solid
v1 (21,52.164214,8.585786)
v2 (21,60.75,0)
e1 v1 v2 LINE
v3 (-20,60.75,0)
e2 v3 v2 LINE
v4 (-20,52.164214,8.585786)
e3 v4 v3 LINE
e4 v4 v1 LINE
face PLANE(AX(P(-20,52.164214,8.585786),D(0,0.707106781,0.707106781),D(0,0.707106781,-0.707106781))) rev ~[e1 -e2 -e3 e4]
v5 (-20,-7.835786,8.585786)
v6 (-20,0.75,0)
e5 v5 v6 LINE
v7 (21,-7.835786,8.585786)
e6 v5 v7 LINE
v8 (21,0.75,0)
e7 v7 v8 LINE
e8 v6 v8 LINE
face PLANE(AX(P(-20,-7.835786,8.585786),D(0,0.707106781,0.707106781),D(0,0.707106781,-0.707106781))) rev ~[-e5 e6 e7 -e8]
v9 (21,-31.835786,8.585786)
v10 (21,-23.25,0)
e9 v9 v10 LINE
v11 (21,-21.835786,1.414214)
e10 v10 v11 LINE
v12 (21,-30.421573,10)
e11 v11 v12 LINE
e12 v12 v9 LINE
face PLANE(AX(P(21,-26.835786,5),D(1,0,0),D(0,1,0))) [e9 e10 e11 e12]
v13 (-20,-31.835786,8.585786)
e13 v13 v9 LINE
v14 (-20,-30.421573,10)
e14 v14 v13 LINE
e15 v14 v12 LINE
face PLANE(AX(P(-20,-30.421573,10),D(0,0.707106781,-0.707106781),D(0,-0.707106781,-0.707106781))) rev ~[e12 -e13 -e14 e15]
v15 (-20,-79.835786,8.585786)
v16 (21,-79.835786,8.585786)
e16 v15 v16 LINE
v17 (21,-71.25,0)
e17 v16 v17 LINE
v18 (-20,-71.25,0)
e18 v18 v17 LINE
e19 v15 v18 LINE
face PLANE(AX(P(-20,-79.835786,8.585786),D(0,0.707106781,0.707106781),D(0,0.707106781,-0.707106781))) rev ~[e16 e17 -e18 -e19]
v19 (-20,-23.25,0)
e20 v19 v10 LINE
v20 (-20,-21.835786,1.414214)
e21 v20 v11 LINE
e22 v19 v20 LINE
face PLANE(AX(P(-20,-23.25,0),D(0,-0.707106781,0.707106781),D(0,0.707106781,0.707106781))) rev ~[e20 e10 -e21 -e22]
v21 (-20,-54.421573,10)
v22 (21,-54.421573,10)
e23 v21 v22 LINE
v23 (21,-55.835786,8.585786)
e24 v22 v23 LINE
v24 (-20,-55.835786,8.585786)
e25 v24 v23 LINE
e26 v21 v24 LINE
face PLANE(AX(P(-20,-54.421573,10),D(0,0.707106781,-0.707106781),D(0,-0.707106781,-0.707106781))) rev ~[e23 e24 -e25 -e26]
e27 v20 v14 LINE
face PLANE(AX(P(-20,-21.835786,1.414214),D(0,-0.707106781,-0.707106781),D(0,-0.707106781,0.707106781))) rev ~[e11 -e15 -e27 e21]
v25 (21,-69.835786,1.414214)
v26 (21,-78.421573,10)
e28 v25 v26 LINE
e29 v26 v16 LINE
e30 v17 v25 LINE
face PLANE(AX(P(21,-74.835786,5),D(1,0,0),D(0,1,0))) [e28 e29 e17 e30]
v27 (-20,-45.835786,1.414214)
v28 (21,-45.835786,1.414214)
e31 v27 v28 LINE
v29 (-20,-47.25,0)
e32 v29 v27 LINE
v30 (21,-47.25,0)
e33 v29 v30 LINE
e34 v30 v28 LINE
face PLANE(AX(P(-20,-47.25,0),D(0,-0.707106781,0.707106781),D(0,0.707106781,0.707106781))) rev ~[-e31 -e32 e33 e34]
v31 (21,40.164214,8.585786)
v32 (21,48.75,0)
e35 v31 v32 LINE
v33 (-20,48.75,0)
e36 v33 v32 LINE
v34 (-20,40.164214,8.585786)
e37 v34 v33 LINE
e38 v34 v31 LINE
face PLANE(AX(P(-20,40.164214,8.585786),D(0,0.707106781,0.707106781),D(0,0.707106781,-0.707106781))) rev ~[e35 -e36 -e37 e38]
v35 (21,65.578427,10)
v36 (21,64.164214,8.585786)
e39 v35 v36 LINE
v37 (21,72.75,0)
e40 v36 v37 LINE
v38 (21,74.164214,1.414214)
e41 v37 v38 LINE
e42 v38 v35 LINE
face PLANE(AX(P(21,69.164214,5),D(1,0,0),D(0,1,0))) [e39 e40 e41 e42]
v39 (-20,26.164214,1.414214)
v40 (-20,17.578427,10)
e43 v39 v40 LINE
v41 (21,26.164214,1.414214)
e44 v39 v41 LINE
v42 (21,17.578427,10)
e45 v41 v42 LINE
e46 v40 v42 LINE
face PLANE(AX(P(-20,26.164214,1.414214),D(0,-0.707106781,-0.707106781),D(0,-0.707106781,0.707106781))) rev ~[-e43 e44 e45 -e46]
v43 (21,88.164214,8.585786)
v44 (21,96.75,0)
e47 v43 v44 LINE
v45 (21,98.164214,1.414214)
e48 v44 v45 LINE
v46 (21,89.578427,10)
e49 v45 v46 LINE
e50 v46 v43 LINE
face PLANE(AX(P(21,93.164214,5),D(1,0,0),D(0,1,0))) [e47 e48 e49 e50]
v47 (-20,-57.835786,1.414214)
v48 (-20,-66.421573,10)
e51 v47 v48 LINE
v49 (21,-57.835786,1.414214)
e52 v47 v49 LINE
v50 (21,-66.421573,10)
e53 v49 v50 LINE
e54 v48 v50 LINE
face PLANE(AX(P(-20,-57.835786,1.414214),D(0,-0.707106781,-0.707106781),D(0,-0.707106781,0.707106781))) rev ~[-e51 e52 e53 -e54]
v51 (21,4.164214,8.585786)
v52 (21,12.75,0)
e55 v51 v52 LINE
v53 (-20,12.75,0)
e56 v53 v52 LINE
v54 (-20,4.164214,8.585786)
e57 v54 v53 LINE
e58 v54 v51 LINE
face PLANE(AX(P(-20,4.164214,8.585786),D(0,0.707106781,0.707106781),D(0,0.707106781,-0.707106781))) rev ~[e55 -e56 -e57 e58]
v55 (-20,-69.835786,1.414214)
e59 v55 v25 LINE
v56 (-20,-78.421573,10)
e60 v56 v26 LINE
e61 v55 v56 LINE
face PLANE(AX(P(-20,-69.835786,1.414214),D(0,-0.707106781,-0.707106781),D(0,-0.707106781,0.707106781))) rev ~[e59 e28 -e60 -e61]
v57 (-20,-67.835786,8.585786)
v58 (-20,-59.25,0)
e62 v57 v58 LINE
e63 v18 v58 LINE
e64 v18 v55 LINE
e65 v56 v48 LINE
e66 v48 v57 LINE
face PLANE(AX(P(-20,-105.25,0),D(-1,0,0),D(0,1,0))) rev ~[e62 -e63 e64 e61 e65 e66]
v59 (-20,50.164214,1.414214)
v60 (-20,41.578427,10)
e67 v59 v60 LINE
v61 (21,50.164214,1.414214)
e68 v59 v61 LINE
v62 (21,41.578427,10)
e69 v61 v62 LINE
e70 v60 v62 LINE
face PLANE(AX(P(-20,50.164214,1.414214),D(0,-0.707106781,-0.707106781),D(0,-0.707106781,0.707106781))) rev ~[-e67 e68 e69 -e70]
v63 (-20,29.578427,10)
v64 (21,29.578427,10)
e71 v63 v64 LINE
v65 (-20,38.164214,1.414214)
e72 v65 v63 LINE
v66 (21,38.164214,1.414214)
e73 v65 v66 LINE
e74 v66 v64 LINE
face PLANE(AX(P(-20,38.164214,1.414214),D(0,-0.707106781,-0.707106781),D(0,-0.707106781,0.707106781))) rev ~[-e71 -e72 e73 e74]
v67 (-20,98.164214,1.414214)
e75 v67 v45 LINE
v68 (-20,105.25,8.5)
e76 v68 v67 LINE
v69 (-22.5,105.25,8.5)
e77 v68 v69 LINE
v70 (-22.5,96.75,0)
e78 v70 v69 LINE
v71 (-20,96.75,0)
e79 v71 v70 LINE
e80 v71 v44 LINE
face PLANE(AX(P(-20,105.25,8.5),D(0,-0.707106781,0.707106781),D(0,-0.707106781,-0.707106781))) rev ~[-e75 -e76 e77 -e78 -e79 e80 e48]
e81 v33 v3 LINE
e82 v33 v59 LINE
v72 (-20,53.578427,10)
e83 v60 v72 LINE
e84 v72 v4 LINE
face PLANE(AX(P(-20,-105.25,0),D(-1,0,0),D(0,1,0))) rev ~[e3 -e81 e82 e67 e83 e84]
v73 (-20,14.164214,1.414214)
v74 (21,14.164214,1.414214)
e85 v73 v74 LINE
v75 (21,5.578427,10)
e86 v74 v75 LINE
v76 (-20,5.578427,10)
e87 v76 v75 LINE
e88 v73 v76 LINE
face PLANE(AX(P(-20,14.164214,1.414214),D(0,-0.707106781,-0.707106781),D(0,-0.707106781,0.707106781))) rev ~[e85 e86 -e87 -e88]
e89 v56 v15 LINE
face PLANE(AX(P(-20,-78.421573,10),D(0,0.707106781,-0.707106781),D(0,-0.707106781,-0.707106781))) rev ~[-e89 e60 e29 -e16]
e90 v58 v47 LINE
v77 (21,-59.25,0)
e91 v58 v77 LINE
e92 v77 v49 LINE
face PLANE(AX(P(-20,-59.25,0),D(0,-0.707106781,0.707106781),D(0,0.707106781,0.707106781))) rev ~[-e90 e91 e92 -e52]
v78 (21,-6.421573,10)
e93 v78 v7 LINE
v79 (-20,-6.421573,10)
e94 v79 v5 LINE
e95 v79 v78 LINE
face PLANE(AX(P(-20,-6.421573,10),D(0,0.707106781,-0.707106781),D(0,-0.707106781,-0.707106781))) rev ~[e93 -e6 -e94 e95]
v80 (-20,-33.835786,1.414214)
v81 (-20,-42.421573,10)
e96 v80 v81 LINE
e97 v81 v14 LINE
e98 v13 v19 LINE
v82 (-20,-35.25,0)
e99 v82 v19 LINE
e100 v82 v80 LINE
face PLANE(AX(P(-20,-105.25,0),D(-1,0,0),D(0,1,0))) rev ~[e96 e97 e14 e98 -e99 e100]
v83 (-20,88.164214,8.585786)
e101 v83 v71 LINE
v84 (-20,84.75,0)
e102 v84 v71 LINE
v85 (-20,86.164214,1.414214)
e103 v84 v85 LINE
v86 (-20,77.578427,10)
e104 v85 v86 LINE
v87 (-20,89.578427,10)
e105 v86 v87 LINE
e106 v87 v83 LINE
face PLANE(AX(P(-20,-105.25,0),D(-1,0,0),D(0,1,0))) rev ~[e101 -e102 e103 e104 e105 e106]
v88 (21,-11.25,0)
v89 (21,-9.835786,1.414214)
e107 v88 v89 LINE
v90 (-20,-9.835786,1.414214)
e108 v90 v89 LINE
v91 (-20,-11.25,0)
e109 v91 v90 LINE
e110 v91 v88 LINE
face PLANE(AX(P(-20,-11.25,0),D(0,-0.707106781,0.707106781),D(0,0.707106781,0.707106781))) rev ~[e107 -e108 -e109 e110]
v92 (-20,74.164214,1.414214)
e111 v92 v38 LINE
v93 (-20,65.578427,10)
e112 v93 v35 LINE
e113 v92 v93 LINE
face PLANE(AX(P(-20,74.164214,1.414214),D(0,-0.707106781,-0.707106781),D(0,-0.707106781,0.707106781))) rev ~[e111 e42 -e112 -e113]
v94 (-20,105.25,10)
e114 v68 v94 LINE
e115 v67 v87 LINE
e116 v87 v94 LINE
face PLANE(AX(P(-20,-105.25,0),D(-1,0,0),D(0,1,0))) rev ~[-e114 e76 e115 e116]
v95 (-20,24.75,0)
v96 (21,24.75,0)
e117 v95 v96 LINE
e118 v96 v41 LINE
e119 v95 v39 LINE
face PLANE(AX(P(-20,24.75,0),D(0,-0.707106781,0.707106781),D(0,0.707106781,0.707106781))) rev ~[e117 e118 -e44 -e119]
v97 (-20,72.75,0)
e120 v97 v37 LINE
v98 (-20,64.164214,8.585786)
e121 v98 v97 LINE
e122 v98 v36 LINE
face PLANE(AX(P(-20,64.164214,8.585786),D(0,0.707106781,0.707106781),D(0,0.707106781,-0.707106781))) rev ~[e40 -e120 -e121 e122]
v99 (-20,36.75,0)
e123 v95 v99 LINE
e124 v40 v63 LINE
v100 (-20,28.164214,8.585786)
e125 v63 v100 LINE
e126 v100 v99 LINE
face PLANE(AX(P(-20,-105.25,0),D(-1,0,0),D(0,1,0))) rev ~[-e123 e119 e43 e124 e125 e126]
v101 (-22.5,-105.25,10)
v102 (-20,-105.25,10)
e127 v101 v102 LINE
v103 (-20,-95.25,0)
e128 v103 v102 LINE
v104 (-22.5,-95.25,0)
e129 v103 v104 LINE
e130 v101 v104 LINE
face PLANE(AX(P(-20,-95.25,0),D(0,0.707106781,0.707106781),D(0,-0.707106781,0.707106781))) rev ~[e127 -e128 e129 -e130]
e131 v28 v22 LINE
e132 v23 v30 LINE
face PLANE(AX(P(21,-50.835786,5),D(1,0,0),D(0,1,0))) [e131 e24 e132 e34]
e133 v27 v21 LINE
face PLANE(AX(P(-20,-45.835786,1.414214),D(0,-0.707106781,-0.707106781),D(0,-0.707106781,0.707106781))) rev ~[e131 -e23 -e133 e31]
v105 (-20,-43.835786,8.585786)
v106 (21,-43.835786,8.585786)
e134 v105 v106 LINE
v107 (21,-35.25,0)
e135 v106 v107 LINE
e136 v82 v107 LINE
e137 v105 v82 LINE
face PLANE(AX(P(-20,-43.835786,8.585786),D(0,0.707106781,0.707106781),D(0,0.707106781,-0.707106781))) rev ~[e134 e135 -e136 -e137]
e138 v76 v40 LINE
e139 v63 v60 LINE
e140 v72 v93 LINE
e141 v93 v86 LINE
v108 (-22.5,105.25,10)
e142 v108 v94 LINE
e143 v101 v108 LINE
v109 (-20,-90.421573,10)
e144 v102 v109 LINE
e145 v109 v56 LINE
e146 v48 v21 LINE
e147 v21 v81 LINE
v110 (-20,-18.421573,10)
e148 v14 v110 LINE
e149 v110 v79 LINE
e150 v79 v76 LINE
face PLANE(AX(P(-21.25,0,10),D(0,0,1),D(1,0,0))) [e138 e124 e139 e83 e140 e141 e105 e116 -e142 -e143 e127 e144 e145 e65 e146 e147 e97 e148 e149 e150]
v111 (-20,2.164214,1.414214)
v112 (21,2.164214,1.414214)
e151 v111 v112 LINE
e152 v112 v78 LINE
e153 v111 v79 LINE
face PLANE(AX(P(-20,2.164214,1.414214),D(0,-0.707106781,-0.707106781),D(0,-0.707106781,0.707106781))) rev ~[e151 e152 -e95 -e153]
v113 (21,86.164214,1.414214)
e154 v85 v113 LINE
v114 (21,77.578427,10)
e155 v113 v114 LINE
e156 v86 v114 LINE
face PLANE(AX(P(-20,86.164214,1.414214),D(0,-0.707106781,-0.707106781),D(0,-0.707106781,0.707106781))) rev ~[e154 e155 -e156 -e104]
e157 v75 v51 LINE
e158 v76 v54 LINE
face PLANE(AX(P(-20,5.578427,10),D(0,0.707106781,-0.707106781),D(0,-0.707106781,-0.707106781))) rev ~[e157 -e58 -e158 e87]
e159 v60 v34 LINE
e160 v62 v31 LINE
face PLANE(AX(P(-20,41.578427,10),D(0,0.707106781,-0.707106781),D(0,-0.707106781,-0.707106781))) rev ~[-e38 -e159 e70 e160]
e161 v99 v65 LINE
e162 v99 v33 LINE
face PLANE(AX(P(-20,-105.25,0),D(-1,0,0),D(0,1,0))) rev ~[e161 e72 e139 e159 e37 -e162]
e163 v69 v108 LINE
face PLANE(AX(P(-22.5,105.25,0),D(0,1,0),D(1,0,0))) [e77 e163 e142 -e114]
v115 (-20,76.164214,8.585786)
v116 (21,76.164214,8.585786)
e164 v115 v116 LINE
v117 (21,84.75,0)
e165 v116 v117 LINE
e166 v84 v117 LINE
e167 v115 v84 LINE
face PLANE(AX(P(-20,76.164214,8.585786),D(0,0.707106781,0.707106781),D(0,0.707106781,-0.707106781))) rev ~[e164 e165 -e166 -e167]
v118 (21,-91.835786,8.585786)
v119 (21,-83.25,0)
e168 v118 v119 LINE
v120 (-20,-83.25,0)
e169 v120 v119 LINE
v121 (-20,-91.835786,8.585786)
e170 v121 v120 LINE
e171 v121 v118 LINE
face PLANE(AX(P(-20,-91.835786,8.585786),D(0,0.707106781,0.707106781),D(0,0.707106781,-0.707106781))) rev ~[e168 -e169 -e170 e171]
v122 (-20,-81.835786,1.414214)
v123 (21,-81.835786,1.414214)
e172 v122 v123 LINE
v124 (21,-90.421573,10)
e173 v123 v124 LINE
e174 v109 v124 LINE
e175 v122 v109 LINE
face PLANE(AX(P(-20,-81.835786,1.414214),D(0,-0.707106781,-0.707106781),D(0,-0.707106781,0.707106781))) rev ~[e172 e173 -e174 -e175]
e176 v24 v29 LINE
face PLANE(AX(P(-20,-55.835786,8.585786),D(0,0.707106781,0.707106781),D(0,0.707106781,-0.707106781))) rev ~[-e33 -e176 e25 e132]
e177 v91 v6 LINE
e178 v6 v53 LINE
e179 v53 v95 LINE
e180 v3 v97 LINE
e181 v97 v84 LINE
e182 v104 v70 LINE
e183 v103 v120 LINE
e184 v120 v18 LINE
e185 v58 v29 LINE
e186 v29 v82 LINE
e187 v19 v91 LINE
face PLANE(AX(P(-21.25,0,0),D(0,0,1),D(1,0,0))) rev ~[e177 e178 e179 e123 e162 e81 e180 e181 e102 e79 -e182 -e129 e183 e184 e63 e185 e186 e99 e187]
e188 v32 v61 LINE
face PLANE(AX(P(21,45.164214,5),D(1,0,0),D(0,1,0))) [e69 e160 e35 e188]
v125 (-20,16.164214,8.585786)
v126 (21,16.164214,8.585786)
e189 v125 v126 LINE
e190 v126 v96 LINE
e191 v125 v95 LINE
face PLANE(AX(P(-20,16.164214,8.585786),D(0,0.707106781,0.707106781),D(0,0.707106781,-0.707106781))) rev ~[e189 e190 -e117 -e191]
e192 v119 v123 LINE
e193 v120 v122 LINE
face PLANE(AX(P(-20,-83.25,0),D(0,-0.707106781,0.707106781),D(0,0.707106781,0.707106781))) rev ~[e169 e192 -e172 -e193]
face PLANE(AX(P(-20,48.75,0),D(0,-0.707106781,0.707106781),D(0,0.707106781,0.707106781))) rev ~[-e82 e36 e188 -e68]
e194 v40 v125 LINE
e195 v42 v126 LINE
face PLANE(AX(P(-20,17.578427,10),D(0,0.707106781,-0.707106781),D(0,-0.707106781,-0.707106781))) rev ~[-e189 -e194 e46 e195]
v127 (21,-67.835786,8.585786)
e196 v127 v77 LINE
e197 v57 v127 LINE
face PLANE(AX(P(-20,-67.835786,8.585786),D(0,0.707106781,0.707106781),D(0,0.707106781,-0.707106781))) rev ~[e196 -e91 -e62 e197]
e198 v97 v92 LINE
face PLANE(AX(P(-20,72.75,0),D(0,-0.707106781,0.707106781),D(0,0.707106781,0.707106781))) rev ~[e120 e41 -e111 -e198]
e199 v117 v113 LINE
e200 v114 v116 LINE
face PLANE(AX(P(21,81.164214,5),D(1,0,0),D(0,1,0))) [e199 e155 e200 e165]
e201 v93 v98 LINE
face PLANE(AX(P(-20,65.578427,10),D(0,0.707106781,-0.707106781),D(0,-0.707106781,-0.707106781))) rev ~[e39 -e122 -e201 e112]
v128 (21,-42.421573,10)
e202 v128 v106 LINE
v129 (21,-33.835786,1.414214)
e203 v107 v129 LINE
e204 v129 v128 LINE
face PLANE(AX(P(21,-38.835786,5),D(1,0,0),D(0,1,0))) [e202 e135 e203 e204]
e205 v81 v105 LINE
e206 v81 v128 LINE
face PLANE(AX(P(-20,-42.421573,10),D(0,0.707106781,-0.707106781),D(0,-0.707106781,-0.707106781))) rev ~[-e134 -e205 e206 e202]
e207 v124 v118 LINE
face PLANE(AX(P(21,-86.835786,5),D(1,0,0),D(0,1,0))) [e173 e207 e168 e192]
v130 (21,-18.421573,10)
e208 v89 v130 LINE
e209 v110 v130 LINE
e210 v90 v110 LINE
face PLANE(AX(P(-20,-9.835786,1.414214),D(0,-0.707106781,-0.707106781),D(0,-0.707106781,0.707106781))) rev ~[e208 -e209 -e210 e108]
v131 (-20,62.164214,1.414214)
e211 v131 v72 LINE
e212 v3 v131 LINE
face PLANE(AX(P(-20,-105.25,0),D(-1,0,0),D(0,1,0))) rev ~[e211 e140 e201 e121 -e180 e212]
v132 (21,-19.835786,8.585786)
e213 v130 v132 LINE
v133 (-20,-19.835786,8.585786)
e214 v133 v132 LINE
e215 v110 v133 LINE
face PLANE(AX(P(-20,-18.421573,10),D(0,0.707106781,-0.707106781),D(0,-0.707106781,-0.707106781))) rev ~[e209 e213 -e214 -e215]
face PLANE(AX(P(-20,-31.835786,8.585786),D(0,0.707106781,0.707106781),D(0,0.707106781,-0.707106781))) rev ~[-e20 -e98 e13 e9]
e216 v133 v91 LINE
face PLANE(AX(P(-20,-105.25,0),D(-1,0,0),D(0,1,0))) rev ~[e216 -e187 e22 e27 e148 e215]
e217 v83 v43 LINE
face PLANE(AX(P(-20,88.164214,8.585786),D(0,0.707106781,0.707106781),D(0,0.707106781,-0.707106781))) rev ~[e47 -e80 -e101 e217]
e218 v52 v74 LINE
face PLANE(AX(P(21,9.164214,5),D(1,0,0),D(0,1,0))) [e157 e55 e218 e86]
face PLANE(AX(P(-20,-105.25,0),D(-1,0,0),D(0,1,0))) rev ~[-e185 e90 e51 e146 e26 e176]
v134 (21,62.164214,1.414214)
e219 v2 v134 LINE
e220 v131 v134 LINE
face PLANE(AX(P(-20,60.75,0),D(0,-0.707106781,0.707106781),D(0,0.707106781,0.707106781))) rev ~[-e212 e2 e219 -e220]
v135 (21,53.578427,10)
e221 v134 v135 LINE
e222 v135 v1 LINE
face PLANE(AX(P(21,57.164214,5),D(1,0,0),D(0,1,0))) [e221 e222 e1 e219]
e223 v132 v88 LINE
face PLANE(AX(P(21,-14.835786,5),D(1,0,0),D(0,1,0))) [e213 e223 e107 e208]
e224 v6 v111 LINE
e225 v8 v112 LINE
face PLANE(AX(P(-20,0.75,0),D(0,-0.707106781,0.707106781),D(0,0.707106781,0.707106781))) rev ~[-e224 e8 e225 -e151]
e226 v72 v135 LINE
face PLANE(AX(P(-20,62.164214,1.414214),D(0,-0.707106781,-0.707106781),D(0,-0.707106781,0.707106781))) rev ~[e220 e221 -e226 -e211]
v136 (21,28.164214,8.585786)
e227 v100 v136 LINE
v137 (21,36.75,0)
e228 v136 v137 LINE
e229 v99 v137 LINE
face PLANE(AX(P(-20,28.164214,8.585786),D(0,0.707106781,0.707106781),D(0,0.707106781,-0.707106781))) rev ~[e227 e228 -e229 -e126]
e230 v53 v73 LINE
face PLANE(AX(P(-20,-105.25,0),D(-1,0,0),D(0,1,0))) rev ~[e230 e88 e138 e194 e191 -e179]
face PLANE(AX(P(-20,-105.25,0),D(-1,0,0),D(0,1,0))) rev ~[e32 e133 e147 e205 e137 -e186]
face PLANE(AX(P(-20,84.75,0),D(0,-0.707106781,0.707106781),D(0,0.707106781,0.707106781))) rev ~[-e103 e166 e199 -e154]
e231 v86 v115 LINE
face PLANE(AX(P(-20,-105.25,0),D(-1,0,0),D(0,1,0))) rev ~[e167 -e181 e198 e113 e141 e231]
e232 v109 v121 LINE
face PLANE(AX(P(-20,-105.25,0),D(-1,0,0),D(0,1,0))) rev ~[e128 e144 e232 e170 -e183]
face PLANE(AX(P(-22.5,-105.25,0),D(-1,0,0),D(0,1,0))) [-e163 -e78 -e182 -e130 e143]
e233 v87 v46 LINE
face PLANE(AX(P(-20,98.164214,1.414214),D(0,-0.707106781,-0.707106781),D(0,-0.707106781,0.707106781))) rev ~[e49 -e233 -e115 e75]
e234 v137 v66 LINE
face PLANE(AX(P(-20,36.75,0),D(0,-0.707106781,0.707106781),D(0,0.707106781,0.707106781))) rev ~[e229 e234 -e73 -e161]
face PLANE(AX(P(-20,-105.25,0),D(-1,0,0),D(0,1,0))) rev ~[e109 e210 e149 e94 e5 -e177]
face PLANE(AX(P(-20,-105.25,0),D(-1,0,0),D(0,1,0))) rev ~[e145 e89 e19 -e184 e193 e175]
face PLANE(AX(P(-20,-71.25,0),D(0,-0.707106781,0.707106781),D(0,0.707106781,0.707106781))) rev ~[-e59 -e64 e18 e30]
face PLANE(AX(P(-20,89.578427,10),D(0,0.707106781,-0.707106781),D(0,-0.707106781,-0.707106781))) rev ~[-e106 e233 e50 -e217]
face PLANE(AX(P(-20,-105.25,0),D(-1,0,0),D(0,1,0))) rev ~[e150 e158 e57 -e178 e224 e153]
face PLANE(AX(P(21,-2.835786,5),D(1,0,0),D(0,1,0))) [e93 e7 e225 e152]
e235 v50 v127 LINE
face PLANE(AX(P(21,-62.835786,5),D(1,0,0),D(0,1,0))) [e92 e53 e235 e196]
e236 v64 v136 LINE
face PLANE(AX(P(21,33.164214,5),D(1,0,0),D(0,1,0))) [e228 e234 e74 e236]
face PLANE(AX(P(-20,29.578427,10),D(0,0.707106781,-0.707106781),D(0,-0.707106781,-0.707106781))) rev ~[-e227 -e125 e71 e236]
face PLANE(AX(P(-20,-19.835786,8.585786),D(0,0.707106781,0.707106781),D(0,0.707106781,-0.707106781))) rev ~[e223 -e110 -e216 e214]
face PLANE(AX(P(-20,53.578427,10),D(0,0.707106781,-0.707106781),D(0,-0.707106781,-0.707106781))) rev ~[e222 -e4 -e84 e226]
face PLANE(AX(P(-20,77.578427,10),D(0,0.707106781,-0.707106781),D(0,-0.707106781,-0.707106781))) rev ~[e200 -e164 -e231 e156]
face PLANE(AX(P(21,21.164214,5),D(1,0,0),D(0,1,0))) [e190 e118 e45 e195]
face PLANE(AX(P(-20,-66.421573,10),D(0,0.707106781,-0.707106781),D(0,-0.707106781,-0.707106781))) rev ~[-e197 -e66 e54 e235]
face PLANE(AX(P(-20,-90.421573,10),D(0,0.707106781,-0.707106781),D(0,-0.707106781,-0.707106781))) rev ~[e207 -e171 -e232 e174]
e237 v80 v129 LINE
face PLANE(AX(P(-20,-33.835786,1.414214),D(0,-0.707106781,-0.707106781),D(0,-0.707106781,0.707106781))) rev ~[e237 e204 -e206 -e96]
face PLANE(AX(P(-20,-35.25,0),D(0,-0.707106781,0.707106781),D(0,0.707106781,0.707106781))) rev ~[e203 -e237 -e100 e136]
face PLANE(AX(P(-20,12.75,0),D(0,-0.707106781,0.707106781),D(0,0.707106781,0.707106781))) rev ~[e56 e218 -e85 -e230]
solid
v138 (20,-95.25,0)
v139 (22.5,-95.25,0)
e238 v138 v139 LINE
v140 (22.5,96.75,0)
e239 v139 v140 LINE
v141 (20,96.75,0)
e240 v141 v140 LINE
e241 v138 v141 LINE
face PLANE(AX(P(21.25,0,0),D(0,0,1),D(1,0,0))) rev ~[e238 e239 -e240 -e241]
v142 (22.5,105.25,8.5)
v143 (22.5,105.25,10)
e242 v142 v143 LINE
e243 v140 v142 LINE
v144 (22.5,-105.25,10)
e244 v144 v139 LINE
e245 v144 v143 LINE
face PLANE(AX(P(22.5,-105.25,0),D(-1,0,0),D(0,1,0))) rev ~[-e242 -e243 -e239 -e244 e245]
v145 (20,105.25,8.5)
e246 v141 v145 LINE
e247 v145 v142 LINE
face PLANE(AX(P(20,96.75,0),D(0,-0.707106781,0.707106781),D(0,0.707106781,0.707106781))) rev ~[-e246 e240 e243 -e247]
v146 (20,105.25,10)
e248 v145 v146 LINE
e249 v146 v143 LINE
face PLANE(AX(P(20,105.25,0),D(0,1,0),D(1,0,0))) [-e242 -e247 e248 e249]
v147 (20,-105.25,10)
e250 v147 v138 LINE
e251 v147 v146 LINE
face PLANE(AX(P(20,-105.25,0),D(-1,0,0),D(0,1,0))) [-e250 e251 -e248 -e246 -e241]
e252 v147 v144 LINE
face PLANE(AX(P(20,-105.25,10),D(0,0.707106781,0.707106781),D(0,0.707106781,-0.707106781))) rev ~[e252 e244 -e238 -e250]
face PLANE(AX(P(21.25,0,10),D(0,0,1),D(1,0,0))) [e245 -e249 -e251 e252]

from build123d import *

# Parameters (mm, degrees)
F0_W     = 2.5
F0_H     = 210.5
F1_DEPTH = 10
F3_DEPTH = 41
F4_DEPTH = 3
F6_DEPTH = 4


with BuildPart() as f1:
    # F0 (on Top) → F1 (new body)
    with BuildSketch(Plane.XY):
        with Locations((-21.25, 0)):
            Rectangle(F0_W, F0_H)
    extrude(amount=F1_DEPTH)

    # F2 (on face) → F3 (join)
    with BuildSketch(Plane.YZ.offset(-20)):
        Polygon((-91.8357864376, 8.5857864376), (-83.25, 0), (-81.8357864376, 1.4142135624), (-90.4215728753, 10), align=None)
        Polygon((-79.8357864376, 8.5857864376), (-71.25, 0), (-69.8357864376, 1.4142135624), (-78.4215728753, 10), align=None)
        Polygon((-67.8357864376, 8.5857864376), (-59.25, 0), (-57.8357864376, 1.4142135624), (-66.4215728753, 10), align=None)
        Polygon((-55.8357864376, 8.5857864376), (-47.25, 0), (-45.8357864376, 1.4142135624), (-54.4215728753, 10), align=None)
        Polygon((-43.8357864376, 8.5857864376), (-35.25, 0), (-33.8357864376, 1.4142135624), (-42.4215728753, 10), align=None)
        Polygon((-31.8357864376, 8.5857864376), (-23.25, 0), (-21.8357864376, 1.4142135624), (-30.4215728753, 10), align=None)
        Polygon((-19.8357864376, 8.5857864376), (-11.25, 0), (-9.8357864376, 1.4142135624), (-18.4215728753, 10), align=None)
        Polygon((-7.8357864376, 8.5857864376), (0.75, 0), (2.1642135624, 1.4142135624), (-6.4215728753, 10), align=None)
        Polygon((4.1642135624, 8.5857864376), (12.75, 0), (14.1642135624, 1.4142135624), (5.5784271247, 10), align=None)
        Polygon((16.1642135624, 8.5857864376), (24.75, 0), (26.1642135624, 1.4142135624), (17.5784271247, 10), align=None)
        Polygon((28.1642135624, 8.5857864376), (36.75, 0), (38.1642135624, 1.4142135624), (29.5784271247, 10), align=None)
        Polygon((40.1642135624, 8.5857864376), (48.75, 0), (50.1642135624, 1.4142135624), (41.5784271247, 10), align=None)
        Polygon((52.1642135624, 8.5857864376), (60.75, 0), (62.1642135624, 1.4142135624), (53.5784271247, 10), align=None)
        Polygon((64.1642135624, 8.5857864376), (72.75, 0), (74.1642135624, 1.4142135624), (65.5784271247, 10), align=None)
        Polygon((76.1642135624, 8.5857864376), (84.75, 0), (86.1642135624, 1.4142135624), (77.5784271247, 10), align=None)
        Polygon((88.1642135624, 8.5857864376), (96.75, 0), (98.1642135624, 1.4142135624), (89.5784271247, 10), align=None)
    extrude(amount=F3_DEPTH)

    # F2 (on face) → F4 (cut)
    with BuildSketch(Plane.YZ.offset(-20)):
        Polygon((98.1642135624, 1.4142135624), (96.75, 0), (105.25, 0), (105.25, 8.5), align=None)
        Polygon((-105.25, 10), (-105.25, 0), (-95.25, 0), align=None)
    extrude(amount=-F4_DEPTH, mode=Mode.SUBTRACT)


with BuildPart() as f1b:
    # F0 (on Top) → F1, piece 2 (new body)
    with BuildSketch(Plane.XY):
        with Locations((21.25, 0)):
            Rectangle(F0_W, F0_H)
    extrude(amount=F1_DEPTH)

    # F5 (on face) → F6 (cut)
    with BuildSketch(Plane(origin=(20, 0, 0), x_dir=(0, -1, 0), z_dir=(-1, 0, 0))):
        Polygon((105.25, 10), (95.25, 0), (105.25, 0), align=None)
        Polygon((-96.75, 0), (-105.25, 8.5), (-105.25, 0), align=None)
    extrude(amount=-F6_DEPTH, mode=Mode.SUBTRACT)


solid = Compound([f1.part, f1b.part])
